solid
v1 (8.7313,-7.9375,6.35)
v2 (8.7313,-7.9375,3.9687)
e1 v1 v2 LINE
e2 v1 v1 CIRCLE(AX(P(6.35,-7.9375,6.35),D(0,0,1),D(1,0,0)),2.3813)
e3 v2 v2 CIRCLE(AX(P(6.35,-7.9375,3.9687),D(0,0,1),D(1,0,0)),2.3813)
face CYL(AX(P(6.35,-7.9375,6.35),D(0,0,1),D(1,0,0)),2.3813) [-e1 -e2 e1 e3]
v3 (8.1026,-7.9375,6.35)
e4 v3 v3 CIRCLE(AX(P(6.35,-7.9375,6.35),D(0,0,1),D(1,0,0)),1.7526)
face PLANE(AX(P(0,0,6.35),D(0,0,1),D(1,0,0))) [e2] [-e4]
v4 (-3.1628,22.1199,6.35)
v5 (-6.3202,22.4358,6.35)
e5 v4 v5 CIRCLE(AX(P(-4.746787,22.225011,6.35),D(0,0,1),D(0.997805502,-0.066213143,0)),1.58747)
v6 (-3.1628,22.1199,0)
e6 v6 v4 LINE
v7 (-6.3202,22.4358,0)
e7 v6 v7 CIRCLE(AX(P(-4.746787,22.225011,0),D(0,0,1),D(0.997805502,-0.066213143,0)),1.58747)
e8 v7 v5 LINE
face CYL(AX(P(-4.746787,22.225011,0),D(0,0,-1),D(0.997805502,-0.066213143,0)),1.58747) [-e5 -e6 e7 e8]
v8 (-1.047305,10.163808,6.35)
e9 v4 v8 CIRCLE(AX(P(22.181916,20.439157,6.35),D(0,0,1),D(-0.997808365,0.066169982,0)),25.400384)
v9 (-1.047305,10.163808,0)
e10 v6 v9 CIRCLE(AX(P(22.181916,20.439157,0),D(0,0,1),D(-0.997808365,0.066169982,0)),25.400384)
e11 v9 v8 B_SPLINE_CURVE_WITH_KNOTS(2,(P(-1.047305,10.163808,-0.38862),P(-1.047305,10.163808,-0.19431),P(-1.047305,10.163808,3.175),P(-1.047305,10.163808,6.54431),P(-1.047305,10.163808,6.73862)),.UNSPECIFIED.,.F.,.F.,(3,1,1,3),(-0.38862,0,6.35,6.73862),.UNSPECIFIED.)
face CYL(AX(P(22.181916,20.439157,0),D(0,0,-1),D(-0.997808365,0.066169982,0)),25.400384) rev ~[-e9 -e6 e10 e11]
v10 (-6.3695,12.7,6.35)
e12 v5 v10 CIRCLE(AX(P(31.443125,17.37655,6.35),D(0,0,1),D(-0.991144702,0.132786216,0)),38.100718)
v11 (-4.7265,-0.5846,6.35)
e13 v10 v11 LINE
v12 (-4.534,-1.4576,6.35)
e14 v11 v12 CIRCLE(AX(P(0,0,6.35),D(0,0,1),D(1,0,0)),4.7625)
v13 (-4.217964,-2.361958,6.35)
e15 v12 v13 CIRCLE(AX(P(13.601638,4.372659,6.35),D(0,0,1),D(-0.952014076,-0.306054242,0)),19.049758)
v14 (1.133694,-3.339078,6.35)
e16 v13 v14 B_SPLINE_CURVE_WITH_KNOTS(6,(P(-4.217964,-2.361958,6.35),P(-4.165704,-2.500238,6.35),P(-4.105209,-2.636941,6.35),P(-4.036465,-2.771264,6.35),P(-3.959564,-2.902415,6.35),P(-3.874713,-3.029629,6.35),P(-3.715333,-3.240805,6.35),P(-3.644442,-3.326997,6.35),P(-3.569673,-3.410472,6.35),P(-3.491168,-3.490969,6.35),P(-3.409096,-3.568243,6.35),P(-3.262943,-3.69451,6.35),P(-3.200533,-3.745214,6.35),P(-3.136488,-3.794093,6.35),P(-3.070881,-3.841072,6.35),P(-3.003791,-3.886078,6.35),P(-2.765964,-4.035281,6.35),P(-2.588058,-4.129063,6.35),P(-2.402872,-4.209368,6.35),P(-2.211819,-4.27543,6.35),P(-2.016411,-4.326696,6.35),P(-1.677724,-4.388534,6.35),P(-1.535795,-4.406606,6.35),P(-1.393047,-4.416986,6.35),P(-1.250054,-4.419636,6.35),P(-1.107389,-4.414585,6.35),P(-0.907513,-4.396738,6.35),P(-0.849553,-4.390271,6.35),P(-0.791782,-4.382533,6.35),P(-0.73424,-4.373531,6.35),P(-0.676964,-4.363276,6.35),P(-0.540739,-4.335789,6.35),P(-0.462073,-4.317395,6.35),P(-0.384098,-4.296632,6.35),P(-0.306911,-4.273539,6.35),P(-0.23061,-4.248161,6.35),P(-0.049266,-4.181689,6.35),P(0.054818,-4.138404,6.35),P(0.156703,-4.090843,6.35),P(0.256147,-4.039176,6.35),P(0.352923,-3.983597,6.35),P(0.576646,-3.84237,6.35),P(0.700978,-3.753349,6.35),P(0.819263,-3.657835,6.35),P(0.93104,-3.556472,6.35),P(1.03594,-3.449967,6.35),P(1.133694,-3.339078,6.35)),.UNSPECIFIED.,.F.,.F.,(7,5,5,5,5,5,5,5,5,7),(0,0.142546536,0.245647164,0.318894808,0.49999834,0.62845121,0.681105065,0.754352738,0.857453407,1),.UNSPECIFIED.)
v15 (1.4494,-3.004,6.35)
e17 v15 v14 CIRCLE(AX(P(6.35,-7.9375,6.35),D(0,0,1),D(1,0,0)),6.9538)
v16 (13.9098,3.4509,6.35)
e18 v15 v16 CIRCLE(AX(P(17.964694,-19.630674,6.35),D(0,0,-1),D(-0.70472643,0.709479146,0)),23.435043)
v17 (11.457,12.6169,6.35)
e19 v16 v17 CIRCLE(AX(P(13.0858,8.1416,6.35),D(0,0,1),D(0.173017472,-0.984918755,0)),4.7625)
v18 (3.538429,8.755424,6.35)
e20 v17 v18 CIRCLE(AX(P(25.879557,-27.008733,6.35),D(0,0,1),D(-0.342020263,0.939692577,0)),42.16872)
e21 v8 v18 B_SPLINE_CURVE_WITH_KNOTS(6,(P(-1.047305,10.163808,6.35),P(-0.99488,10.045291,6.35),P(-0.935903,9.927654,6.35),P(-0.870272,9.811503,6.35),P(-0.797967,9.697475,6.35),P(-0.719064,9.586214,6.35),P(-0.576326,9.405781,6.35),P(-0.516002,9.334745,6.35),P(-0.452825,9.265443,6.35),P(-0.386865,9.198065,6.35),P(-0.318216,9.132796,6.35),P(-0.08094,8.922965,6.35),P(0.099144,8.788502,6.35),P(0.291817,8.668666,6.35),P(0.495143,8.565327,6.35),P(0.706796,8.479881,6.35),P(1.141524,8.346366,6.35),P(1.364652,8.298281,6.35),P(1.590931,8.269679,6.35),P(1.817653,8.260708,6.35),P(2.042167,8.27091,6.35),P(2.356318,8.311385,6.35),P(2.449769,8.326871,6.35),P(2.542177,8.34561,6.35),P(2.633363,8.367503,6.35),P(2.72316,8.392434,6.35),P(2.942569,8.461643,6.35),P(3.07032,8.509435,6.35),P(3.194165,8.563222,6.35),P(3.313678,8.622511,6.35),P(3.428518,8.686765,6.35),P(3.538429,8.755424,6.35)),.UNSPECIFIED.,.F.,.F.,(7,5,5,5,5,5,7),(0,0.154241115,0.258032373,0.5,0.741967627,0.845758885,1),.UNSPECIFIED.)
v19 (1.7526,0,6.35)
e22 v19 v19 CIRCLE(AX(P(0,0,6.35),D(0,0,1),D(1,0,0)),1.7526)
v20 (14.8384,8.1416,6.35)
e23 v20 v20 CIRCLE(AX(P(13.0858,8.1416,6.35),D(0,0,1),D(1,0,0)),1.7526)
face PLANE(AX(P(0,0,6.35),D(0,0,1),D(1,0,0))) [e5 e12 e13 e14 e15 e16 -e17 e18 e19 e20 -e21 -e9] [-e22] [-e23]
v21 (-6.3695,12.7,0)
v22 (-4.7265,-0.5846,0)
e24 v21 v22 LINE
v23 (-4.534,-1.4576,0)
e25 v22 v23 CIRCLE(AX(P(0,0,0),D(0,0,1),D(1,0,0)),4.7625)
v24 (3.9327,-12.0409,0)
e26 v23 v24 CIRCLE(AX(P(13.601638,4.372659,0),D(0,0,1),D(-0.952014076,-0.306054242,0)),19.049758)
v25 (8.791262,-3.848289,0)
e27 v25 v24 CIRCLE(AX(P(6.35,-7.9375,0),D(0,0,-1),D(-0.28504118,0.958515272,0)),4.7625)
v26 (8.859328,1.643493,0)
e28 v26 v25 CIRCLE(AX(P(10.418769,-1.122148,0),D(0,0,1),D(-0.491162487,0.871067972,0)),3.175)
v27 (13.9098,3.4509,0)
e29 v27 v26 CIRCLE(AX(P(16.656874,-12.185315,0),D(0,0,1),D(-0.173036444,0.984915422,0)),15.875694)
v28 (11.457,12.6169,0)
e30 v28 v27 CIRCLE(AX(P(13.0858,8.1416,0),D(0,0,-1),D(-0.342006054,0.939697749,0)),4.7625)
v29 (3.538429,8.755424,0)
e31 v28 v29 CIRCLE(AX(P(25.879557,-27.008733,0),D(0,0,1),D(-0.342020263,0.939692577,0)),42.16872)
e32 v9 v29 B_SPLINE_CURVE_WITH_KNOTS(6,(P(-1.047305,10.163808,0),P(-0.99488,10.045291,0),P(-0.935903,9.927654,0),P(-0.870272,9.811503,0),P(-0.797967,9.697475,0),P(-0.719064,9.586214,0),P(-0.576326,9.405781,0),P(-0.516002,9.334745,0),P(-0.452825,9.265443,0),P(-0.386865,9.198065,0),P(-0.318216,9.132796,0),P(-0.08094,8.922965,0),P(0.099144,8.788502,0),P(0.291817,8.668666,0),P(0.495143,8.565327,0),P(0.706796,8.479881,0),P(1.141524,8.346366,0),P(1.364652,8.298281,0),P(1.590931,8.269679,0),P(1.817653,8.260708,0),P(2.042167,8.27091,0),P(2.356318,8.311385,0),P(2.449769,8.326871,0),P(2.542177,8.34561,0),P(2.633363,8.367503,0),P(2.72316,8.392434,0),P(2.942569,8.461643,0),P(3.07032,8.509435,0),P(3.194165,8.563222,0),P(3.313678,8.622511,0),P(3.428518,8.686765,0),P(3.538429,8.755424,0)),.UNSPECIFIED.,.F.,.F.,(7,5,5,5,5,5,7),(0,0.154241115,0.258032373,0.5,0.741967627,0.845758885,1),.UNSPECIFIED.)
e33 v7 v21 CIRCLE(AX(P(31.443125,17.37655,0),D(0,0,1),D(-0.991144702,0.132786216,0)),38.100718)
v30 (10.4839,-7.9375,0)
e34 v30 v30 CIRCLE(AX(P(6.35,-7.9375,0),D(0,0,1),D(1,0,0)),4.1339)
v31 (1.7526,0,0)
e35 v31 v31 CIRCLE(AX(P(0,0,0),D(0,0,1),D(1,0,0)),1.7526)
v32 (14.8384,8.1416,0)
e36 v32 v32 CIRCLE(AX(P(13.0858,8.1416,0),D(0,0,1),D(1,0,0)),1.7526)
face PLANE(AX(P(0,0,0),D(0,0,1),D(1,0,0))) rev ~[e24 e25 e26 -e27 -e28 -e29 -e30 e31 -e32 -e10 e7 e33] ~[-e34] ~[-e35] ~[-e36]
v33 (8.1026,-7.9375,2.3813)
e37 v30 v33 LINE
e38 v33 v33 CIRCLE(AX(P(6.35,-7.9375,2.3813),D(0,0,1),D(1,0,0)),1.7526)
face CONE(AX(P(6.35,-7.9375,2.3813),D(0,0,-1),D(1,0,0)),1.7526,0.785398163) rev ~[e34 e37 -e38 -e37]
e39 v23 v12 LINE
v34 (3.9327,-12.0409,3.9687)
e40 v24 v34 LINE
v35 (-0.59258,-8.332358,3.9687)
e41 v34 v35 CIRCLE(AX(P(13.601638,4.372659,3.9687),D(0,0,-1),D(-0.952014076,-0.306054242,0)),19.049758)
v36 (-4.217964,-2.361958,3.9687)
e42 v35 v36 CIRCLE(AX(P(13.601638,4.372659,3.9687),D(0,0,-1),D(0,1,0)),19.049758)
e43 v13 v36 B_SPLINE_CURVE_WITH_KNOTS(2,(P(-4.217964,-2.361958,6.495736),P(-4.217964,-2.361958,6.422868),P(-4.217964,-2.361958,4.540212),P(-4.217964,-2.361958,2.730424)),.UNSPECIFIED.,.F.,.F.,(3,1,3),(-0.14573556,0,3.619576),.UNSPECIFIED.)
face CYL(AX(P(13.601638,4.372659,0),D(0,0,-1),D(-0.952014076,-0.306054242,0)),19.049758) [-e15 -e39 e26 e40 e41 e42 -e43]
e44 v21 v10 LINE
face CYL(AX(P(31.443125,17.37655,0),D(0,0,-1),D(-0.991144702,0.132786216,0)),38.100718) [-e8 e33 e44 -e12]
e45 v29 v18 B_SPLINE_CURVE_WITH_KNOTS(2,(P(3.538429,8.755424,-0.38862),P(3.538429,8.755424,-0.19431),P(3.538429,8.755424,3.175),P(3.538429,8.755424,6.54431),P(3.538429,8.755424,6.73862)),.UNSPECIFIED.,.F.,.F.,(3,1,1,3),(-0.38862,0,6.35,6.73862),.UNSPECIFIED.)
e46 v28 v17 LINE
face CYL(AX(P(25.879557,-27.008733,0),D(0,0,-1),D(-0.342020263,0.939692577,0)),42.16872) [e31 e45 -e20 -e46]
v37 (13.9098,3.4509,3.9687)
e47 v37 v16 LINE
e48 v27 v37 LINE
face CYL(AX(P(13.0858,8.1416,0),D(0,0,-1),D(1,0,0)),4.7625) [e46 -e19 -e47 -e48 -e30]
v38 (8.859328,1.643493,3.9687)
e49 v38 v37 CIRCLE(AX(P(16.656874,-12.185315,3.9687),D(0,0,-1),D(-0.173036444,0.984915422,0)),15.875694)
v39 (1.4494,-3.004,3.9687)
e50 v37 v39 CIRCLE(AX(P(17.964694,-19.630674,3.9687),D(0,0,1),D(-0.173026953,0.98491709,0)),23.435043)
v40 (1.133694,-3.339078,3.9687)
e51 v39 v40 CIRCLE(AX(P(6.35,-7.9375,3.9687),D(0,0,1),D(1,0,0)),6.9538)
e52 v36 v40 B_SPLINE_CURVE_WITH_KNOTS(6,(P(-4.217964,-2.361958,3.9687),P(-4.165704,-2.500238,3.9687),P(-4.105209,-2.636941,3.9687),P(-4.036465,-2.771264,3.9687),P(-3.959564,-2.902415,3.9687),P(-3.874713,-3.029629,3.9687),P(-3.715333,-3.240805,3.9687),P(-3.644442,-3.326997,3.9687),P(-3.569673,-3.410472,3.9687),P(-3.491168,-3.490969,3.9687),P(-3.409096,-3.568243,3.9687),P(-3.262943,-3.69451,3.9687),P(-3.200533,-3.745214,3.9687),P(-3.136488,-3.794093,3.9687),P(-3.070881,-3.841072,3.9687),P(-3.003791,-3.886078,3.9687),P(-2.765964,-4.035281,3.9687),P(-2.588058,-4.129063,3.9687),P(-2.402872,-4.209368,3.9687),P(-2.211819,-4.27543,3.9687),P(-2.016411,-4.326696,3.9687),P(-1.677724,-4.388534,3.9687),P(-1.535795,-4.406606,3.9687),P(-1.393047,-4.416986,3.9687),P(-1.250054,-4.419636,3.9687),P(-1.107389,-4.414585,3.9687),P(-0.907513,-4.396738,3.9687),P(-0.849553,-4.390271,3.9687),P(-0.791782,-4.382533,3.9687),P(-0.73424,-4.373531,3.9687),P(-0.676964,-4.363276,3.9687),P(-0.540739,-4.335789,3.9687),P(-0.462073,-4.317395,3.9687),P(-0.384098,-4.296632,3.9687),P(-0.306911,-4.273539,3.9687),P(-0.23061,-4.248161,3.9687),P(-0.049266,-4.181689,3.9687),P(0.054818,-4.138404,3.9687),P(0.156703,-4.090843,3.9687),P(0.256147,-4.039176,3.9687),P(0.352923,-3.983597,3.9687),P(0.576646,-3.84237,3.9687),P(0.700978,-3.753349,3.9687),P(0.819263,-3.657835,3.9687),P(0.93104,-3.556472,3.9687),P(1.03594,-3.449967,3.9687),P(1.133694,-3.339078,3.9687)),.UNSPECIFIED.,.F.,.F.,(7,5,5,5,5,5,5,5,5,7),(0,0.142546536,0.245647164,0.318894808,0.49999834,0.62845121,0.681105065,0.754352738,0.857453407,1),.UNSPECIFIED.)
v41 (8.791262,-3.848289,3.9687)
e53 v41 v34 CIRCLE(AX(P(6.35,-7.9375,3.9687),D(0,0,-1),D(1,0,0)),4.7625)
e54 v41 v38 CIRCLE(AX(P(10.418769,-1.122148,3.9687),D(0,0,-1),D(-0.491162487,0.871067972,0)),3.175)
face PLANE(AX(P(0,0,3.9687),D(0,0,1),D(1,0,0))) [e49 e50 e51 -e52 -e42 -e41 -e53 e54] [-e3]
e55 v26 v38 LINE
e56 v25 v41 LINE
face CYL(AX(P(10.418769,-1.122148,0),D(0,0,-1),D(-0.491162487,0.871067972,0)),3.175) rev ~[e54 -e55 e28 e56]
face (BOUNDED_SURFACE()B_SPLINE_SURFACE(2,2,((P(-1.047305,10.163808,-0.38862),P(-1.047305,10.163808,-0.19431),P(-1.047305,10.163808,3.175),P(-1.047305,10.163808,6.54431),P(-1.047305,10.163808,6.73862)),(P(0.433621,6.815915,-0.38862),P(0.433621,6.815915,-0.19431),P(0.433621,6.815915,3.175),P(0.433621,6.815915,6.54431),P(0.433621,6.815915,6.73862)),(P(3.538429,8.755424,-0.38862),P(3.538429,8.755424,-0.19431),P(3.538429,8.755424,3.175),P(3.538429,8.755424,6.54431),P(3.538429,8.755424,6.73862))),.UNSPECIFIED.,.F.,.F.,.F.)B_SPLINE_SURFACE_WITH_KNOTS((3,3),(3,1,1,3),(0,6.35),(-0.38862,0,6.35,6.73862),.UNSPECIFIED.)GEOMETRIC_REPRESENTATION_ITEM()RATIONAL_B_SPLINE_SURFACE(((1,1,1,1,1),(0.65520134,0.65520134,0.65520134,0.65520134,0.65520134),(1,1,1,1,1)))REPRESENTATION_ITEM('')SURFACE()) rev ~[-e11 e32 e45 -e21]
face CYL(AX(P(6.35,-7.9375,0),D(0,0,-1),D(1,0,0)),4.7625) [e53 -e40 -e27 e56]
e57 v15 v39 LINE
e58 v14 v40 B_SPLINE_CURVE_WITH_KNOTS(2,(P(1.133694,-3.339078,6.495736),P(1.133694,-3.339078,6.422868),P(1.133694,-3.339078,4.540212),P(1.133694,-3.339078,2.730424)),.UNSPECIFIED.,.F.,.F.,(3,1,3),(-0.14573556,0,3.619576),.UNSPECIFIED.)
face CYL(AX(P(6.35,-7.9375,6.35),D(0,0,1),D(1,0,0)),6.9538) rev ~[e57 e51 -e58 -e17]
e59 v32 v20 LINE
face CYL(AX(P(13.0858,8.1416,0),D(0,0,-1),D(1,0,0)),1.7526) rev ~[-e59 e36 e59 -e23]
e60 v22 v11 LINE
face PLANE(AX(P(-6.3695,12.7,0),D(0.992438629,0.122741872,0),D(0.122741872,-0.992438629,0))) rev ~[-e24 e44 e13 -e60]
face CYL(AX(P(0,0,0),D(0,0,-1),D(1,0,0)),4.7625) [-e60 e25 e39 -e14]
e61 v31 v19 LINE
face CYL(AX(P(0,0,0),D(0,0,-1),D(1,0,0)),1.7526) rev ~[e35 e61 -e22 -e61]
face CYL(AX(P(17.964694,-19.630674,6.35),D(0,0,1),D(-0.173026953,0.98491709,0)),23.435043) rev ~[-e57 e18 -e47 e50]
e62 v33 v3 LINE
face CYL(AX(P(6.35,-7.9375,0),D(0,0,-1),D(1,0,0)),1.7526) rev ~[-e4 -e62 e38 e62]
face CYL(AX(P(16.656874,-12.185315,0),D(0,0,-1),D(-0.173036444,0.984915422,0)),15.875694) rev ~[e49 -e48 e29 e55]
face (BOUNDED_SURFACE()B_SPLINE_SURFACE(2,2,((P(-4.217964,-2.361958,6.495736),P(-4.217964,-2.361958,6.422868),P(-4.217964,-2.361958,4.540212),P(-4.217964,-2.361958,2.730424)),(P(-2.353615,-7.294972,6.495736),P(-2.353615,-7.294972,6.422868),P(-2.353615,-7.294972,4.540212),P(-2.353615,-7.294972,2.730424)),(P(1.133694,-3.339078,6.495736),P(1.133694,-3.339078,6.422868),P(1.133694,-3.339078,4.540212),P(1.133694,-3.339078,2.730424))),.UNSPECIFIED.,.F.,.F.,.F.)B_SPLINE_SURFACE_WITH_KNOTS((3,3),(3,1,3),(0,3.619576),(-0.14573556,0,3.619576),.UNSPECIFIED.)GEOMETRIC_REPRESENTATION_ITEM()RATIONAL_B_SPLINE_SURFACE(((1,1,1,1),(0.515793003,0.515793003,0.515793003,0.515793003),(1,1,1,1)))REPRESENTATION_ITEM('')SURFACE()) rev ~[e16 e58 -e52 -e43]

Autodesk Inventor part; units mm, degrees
ref_plane "YZ Plane" through (0, 0, 0) normal (1, 0, 0) x (0, 1, 0)
ref_plane "XZ Plane" through (0, 0, 0) normal (0, 1, 0) x (-1, 0, 0)
ref_plane "XY Plane" through (0, 0, 0) normal (0, 0, 1) x (1, 0, 0)
sketch "Sketch1" plane through (0, 0, 0) normal (0, 0, 1) x (1, 0, 0)
  circle A0 centre (0, 0) radius 1.7526
  circle A1 centre (0, 0) radius 4.7625
  circle A2 centre (0, 0) radius 19.05 construction
  circle A3 centre (0, 19.05) radius 3.175 construction
  line L0 (0, 19.05) -> (0, 0) construction
  line L1 (0, 19.05) -> (3.175, 19.05) construction
  arc A4 (-3.1628, 22.1199) -> (-6.3202, 22.4358) centre (-4.7468, 22.225) ccw
  arc A5 (-6.3202, 22.4358) -> (-6.3695, 12.7) centre (31.4424, 17.3766) ccw
  line L2 (-6.3695, 12.7) -> (-4.7265, -0.5846)
  circle A6 centre (13.0858, 8.1416) radius 6.35 construction
  line L3 (7.1188, 5.9698) -> (13.0858, 8.1416) construction
  line L4 (0, 0) -> (-3.1615, 8.6862) construction
  circle A7 centre (13.0858, 8.1416) radius 1.7526
  circle A8 centre (13.0858, 8.1416) radius 4.7625
  arc A9 (-3.1628, 22.1199) -> (3.5023, 3.2272) centre (22.1815, 20.4391) ccw
  arc A10 (11.457, 12.6169) -> (-3.295, 3.4387) centre (25.8792, -27.008) ccw
  line L5 (11.457, 12.6169) -> (7.5101, 11.1804) construction
  arc A11 (13.9098, 3.4509) -> (3.8438, -2.8118) centre (16.6566, -12.1846) ccw
  circle A12 centre (6.35, -7.9375) radius 6.35 construction
  circle A13 centre (6.35, -7.9375) radius 1.7526
  circle A14 centre (6.35, -7.9375) radius 4.7625
  arc A15 (14.3671, 3.5547) -> (10.518, -5.6334) centre (16.0754, -2.5612) ccw
  arc A16 (-4.534, -1.4576) -> (3.9327, -12.0409) centre (13.6019, 4.3728) ccw
  arc A17 (8.88, 5.9072) -> (4.9925, -3.3726) centre (16.0754, -2.5612) ccw
  arc A18 (2.1929, -4.2276) -> (2.7069, -4.8701) centre (13.6019, 4.3728) ccw
  arc A19 (8.7233, 6.2311) -> (3.6415, 3.0694) centre (25.8792, -27.008) ccw
  circle A20 centre (0, 0) radius 3.175 construction
  point P0 (3.7177, 2.9766)
  point P1 (0.7293, 6.839)
  point P2 (4.2726, -2.1039)
  point P3 (-4.7377, -0.494)
  point P4 (1.4187, -4.5463)
  point P5 (3.3438, -3.3912)
  point P6 (5.0258, -1.3799)
  dimension "d1" = 9.525
  dimension "d2" = 38.1
  dimension "d3" = 6.35
  dimension "d0" = 3.5052
  dimension "d5" = 3.175
  dimension "d6" = 3.175
  dimension "d7" = 38.1
  dimension "d8" = 6.35
  dimension "d11" = 12.7
  dimension "d12" = 3.5052
  dimension "Pivot_x" = 15.0813
  dimension "Pivot_y" = 3.175
  dimension "d16" = 9.525
  dimension "d18" = 25.4
  dimension "d19" = 15.875
  dimension "d21" = 12.7
  dimension "d22" = 3.5052
  dimension "d23" = 7.9375
  dimension "d24" = 6.35
  dimension "d25" = 9.525
  dimension "d26" = 6.35
  dimension "d27" = 4.7625
  dimension "d28" = 4.7625
  dimension "d29" = 4.7625
  dimension "d31" = 19.05
  dimension "Angle_Offset" = 20
  dimension "d33" = 6.35
extrude "Extrusion1" add sketch "Sketch1" along normal blind 6.35 contours A1 | A1 A19 A8 A17 A11 | A1 A9 A10 A8 A19 | A11 A17 A14 A18 A1 | A1 A10 A9 | A8 | A18 A14 A16 A1 | A17 A8 A11 | A1 L2 A5 A4 A9 A10 | A14
fillet "Fillet1" radius 3.175 1 edges at (0.7293, 6.839, 3.175)
fillet "Fillet2" [suppressed]
fillet "Fillet3" radius 3.175 2 edges at (5.0258, -1.3799, 3.175) (4.9925, -3.3726, 3.175)
chamfer "Chamfer1" distance 2.3813 angle 45 1 edges at (4.5974, -7.9375, 0)
sketch "Sketch3" plane through (0, 0, 6.35) normal (0, 0, 1) x (1, 0, 0)
  circle A0 centre (6.35, -7.9375) radius 1.7526 projected
  circle A1 centre (6.35, -7.9375) radius 6.9538
  arc A2 (13.9098, 3.4509) -> (11.457, 12.6169) centre (13.0858, 8.1416) ccw projected
  arc A3 (13.9098, 3.4509) -> (1.4494, -3.004) centre (17.9645, -19.6301) ccw
  arc A4 (13.9098, 3.4509) -> (8.8593, 1.6435) centre (16.6566, -12.1846) ccw projected
  line L0 (13.9098, 3.4509) -> (13.2943, -8.3012)
  circle A5 centre (0, 0) radius 3.175
  circle A6 centre (6.35, -7.9375) radius 2.3813
  dimension "d42" = 6.35
  dimension "d43" = 4.7625
extrude "Extrusion2" cut sketch "Sketch3" against normal blind 2.3813 contours A1 | A1 A3 L0
fillet "Fillet4" radius 3.175 1 edges at (-0.5926, -8.3324, 5.1594)
properties part number "Lever" material "Aluminum 6061"
